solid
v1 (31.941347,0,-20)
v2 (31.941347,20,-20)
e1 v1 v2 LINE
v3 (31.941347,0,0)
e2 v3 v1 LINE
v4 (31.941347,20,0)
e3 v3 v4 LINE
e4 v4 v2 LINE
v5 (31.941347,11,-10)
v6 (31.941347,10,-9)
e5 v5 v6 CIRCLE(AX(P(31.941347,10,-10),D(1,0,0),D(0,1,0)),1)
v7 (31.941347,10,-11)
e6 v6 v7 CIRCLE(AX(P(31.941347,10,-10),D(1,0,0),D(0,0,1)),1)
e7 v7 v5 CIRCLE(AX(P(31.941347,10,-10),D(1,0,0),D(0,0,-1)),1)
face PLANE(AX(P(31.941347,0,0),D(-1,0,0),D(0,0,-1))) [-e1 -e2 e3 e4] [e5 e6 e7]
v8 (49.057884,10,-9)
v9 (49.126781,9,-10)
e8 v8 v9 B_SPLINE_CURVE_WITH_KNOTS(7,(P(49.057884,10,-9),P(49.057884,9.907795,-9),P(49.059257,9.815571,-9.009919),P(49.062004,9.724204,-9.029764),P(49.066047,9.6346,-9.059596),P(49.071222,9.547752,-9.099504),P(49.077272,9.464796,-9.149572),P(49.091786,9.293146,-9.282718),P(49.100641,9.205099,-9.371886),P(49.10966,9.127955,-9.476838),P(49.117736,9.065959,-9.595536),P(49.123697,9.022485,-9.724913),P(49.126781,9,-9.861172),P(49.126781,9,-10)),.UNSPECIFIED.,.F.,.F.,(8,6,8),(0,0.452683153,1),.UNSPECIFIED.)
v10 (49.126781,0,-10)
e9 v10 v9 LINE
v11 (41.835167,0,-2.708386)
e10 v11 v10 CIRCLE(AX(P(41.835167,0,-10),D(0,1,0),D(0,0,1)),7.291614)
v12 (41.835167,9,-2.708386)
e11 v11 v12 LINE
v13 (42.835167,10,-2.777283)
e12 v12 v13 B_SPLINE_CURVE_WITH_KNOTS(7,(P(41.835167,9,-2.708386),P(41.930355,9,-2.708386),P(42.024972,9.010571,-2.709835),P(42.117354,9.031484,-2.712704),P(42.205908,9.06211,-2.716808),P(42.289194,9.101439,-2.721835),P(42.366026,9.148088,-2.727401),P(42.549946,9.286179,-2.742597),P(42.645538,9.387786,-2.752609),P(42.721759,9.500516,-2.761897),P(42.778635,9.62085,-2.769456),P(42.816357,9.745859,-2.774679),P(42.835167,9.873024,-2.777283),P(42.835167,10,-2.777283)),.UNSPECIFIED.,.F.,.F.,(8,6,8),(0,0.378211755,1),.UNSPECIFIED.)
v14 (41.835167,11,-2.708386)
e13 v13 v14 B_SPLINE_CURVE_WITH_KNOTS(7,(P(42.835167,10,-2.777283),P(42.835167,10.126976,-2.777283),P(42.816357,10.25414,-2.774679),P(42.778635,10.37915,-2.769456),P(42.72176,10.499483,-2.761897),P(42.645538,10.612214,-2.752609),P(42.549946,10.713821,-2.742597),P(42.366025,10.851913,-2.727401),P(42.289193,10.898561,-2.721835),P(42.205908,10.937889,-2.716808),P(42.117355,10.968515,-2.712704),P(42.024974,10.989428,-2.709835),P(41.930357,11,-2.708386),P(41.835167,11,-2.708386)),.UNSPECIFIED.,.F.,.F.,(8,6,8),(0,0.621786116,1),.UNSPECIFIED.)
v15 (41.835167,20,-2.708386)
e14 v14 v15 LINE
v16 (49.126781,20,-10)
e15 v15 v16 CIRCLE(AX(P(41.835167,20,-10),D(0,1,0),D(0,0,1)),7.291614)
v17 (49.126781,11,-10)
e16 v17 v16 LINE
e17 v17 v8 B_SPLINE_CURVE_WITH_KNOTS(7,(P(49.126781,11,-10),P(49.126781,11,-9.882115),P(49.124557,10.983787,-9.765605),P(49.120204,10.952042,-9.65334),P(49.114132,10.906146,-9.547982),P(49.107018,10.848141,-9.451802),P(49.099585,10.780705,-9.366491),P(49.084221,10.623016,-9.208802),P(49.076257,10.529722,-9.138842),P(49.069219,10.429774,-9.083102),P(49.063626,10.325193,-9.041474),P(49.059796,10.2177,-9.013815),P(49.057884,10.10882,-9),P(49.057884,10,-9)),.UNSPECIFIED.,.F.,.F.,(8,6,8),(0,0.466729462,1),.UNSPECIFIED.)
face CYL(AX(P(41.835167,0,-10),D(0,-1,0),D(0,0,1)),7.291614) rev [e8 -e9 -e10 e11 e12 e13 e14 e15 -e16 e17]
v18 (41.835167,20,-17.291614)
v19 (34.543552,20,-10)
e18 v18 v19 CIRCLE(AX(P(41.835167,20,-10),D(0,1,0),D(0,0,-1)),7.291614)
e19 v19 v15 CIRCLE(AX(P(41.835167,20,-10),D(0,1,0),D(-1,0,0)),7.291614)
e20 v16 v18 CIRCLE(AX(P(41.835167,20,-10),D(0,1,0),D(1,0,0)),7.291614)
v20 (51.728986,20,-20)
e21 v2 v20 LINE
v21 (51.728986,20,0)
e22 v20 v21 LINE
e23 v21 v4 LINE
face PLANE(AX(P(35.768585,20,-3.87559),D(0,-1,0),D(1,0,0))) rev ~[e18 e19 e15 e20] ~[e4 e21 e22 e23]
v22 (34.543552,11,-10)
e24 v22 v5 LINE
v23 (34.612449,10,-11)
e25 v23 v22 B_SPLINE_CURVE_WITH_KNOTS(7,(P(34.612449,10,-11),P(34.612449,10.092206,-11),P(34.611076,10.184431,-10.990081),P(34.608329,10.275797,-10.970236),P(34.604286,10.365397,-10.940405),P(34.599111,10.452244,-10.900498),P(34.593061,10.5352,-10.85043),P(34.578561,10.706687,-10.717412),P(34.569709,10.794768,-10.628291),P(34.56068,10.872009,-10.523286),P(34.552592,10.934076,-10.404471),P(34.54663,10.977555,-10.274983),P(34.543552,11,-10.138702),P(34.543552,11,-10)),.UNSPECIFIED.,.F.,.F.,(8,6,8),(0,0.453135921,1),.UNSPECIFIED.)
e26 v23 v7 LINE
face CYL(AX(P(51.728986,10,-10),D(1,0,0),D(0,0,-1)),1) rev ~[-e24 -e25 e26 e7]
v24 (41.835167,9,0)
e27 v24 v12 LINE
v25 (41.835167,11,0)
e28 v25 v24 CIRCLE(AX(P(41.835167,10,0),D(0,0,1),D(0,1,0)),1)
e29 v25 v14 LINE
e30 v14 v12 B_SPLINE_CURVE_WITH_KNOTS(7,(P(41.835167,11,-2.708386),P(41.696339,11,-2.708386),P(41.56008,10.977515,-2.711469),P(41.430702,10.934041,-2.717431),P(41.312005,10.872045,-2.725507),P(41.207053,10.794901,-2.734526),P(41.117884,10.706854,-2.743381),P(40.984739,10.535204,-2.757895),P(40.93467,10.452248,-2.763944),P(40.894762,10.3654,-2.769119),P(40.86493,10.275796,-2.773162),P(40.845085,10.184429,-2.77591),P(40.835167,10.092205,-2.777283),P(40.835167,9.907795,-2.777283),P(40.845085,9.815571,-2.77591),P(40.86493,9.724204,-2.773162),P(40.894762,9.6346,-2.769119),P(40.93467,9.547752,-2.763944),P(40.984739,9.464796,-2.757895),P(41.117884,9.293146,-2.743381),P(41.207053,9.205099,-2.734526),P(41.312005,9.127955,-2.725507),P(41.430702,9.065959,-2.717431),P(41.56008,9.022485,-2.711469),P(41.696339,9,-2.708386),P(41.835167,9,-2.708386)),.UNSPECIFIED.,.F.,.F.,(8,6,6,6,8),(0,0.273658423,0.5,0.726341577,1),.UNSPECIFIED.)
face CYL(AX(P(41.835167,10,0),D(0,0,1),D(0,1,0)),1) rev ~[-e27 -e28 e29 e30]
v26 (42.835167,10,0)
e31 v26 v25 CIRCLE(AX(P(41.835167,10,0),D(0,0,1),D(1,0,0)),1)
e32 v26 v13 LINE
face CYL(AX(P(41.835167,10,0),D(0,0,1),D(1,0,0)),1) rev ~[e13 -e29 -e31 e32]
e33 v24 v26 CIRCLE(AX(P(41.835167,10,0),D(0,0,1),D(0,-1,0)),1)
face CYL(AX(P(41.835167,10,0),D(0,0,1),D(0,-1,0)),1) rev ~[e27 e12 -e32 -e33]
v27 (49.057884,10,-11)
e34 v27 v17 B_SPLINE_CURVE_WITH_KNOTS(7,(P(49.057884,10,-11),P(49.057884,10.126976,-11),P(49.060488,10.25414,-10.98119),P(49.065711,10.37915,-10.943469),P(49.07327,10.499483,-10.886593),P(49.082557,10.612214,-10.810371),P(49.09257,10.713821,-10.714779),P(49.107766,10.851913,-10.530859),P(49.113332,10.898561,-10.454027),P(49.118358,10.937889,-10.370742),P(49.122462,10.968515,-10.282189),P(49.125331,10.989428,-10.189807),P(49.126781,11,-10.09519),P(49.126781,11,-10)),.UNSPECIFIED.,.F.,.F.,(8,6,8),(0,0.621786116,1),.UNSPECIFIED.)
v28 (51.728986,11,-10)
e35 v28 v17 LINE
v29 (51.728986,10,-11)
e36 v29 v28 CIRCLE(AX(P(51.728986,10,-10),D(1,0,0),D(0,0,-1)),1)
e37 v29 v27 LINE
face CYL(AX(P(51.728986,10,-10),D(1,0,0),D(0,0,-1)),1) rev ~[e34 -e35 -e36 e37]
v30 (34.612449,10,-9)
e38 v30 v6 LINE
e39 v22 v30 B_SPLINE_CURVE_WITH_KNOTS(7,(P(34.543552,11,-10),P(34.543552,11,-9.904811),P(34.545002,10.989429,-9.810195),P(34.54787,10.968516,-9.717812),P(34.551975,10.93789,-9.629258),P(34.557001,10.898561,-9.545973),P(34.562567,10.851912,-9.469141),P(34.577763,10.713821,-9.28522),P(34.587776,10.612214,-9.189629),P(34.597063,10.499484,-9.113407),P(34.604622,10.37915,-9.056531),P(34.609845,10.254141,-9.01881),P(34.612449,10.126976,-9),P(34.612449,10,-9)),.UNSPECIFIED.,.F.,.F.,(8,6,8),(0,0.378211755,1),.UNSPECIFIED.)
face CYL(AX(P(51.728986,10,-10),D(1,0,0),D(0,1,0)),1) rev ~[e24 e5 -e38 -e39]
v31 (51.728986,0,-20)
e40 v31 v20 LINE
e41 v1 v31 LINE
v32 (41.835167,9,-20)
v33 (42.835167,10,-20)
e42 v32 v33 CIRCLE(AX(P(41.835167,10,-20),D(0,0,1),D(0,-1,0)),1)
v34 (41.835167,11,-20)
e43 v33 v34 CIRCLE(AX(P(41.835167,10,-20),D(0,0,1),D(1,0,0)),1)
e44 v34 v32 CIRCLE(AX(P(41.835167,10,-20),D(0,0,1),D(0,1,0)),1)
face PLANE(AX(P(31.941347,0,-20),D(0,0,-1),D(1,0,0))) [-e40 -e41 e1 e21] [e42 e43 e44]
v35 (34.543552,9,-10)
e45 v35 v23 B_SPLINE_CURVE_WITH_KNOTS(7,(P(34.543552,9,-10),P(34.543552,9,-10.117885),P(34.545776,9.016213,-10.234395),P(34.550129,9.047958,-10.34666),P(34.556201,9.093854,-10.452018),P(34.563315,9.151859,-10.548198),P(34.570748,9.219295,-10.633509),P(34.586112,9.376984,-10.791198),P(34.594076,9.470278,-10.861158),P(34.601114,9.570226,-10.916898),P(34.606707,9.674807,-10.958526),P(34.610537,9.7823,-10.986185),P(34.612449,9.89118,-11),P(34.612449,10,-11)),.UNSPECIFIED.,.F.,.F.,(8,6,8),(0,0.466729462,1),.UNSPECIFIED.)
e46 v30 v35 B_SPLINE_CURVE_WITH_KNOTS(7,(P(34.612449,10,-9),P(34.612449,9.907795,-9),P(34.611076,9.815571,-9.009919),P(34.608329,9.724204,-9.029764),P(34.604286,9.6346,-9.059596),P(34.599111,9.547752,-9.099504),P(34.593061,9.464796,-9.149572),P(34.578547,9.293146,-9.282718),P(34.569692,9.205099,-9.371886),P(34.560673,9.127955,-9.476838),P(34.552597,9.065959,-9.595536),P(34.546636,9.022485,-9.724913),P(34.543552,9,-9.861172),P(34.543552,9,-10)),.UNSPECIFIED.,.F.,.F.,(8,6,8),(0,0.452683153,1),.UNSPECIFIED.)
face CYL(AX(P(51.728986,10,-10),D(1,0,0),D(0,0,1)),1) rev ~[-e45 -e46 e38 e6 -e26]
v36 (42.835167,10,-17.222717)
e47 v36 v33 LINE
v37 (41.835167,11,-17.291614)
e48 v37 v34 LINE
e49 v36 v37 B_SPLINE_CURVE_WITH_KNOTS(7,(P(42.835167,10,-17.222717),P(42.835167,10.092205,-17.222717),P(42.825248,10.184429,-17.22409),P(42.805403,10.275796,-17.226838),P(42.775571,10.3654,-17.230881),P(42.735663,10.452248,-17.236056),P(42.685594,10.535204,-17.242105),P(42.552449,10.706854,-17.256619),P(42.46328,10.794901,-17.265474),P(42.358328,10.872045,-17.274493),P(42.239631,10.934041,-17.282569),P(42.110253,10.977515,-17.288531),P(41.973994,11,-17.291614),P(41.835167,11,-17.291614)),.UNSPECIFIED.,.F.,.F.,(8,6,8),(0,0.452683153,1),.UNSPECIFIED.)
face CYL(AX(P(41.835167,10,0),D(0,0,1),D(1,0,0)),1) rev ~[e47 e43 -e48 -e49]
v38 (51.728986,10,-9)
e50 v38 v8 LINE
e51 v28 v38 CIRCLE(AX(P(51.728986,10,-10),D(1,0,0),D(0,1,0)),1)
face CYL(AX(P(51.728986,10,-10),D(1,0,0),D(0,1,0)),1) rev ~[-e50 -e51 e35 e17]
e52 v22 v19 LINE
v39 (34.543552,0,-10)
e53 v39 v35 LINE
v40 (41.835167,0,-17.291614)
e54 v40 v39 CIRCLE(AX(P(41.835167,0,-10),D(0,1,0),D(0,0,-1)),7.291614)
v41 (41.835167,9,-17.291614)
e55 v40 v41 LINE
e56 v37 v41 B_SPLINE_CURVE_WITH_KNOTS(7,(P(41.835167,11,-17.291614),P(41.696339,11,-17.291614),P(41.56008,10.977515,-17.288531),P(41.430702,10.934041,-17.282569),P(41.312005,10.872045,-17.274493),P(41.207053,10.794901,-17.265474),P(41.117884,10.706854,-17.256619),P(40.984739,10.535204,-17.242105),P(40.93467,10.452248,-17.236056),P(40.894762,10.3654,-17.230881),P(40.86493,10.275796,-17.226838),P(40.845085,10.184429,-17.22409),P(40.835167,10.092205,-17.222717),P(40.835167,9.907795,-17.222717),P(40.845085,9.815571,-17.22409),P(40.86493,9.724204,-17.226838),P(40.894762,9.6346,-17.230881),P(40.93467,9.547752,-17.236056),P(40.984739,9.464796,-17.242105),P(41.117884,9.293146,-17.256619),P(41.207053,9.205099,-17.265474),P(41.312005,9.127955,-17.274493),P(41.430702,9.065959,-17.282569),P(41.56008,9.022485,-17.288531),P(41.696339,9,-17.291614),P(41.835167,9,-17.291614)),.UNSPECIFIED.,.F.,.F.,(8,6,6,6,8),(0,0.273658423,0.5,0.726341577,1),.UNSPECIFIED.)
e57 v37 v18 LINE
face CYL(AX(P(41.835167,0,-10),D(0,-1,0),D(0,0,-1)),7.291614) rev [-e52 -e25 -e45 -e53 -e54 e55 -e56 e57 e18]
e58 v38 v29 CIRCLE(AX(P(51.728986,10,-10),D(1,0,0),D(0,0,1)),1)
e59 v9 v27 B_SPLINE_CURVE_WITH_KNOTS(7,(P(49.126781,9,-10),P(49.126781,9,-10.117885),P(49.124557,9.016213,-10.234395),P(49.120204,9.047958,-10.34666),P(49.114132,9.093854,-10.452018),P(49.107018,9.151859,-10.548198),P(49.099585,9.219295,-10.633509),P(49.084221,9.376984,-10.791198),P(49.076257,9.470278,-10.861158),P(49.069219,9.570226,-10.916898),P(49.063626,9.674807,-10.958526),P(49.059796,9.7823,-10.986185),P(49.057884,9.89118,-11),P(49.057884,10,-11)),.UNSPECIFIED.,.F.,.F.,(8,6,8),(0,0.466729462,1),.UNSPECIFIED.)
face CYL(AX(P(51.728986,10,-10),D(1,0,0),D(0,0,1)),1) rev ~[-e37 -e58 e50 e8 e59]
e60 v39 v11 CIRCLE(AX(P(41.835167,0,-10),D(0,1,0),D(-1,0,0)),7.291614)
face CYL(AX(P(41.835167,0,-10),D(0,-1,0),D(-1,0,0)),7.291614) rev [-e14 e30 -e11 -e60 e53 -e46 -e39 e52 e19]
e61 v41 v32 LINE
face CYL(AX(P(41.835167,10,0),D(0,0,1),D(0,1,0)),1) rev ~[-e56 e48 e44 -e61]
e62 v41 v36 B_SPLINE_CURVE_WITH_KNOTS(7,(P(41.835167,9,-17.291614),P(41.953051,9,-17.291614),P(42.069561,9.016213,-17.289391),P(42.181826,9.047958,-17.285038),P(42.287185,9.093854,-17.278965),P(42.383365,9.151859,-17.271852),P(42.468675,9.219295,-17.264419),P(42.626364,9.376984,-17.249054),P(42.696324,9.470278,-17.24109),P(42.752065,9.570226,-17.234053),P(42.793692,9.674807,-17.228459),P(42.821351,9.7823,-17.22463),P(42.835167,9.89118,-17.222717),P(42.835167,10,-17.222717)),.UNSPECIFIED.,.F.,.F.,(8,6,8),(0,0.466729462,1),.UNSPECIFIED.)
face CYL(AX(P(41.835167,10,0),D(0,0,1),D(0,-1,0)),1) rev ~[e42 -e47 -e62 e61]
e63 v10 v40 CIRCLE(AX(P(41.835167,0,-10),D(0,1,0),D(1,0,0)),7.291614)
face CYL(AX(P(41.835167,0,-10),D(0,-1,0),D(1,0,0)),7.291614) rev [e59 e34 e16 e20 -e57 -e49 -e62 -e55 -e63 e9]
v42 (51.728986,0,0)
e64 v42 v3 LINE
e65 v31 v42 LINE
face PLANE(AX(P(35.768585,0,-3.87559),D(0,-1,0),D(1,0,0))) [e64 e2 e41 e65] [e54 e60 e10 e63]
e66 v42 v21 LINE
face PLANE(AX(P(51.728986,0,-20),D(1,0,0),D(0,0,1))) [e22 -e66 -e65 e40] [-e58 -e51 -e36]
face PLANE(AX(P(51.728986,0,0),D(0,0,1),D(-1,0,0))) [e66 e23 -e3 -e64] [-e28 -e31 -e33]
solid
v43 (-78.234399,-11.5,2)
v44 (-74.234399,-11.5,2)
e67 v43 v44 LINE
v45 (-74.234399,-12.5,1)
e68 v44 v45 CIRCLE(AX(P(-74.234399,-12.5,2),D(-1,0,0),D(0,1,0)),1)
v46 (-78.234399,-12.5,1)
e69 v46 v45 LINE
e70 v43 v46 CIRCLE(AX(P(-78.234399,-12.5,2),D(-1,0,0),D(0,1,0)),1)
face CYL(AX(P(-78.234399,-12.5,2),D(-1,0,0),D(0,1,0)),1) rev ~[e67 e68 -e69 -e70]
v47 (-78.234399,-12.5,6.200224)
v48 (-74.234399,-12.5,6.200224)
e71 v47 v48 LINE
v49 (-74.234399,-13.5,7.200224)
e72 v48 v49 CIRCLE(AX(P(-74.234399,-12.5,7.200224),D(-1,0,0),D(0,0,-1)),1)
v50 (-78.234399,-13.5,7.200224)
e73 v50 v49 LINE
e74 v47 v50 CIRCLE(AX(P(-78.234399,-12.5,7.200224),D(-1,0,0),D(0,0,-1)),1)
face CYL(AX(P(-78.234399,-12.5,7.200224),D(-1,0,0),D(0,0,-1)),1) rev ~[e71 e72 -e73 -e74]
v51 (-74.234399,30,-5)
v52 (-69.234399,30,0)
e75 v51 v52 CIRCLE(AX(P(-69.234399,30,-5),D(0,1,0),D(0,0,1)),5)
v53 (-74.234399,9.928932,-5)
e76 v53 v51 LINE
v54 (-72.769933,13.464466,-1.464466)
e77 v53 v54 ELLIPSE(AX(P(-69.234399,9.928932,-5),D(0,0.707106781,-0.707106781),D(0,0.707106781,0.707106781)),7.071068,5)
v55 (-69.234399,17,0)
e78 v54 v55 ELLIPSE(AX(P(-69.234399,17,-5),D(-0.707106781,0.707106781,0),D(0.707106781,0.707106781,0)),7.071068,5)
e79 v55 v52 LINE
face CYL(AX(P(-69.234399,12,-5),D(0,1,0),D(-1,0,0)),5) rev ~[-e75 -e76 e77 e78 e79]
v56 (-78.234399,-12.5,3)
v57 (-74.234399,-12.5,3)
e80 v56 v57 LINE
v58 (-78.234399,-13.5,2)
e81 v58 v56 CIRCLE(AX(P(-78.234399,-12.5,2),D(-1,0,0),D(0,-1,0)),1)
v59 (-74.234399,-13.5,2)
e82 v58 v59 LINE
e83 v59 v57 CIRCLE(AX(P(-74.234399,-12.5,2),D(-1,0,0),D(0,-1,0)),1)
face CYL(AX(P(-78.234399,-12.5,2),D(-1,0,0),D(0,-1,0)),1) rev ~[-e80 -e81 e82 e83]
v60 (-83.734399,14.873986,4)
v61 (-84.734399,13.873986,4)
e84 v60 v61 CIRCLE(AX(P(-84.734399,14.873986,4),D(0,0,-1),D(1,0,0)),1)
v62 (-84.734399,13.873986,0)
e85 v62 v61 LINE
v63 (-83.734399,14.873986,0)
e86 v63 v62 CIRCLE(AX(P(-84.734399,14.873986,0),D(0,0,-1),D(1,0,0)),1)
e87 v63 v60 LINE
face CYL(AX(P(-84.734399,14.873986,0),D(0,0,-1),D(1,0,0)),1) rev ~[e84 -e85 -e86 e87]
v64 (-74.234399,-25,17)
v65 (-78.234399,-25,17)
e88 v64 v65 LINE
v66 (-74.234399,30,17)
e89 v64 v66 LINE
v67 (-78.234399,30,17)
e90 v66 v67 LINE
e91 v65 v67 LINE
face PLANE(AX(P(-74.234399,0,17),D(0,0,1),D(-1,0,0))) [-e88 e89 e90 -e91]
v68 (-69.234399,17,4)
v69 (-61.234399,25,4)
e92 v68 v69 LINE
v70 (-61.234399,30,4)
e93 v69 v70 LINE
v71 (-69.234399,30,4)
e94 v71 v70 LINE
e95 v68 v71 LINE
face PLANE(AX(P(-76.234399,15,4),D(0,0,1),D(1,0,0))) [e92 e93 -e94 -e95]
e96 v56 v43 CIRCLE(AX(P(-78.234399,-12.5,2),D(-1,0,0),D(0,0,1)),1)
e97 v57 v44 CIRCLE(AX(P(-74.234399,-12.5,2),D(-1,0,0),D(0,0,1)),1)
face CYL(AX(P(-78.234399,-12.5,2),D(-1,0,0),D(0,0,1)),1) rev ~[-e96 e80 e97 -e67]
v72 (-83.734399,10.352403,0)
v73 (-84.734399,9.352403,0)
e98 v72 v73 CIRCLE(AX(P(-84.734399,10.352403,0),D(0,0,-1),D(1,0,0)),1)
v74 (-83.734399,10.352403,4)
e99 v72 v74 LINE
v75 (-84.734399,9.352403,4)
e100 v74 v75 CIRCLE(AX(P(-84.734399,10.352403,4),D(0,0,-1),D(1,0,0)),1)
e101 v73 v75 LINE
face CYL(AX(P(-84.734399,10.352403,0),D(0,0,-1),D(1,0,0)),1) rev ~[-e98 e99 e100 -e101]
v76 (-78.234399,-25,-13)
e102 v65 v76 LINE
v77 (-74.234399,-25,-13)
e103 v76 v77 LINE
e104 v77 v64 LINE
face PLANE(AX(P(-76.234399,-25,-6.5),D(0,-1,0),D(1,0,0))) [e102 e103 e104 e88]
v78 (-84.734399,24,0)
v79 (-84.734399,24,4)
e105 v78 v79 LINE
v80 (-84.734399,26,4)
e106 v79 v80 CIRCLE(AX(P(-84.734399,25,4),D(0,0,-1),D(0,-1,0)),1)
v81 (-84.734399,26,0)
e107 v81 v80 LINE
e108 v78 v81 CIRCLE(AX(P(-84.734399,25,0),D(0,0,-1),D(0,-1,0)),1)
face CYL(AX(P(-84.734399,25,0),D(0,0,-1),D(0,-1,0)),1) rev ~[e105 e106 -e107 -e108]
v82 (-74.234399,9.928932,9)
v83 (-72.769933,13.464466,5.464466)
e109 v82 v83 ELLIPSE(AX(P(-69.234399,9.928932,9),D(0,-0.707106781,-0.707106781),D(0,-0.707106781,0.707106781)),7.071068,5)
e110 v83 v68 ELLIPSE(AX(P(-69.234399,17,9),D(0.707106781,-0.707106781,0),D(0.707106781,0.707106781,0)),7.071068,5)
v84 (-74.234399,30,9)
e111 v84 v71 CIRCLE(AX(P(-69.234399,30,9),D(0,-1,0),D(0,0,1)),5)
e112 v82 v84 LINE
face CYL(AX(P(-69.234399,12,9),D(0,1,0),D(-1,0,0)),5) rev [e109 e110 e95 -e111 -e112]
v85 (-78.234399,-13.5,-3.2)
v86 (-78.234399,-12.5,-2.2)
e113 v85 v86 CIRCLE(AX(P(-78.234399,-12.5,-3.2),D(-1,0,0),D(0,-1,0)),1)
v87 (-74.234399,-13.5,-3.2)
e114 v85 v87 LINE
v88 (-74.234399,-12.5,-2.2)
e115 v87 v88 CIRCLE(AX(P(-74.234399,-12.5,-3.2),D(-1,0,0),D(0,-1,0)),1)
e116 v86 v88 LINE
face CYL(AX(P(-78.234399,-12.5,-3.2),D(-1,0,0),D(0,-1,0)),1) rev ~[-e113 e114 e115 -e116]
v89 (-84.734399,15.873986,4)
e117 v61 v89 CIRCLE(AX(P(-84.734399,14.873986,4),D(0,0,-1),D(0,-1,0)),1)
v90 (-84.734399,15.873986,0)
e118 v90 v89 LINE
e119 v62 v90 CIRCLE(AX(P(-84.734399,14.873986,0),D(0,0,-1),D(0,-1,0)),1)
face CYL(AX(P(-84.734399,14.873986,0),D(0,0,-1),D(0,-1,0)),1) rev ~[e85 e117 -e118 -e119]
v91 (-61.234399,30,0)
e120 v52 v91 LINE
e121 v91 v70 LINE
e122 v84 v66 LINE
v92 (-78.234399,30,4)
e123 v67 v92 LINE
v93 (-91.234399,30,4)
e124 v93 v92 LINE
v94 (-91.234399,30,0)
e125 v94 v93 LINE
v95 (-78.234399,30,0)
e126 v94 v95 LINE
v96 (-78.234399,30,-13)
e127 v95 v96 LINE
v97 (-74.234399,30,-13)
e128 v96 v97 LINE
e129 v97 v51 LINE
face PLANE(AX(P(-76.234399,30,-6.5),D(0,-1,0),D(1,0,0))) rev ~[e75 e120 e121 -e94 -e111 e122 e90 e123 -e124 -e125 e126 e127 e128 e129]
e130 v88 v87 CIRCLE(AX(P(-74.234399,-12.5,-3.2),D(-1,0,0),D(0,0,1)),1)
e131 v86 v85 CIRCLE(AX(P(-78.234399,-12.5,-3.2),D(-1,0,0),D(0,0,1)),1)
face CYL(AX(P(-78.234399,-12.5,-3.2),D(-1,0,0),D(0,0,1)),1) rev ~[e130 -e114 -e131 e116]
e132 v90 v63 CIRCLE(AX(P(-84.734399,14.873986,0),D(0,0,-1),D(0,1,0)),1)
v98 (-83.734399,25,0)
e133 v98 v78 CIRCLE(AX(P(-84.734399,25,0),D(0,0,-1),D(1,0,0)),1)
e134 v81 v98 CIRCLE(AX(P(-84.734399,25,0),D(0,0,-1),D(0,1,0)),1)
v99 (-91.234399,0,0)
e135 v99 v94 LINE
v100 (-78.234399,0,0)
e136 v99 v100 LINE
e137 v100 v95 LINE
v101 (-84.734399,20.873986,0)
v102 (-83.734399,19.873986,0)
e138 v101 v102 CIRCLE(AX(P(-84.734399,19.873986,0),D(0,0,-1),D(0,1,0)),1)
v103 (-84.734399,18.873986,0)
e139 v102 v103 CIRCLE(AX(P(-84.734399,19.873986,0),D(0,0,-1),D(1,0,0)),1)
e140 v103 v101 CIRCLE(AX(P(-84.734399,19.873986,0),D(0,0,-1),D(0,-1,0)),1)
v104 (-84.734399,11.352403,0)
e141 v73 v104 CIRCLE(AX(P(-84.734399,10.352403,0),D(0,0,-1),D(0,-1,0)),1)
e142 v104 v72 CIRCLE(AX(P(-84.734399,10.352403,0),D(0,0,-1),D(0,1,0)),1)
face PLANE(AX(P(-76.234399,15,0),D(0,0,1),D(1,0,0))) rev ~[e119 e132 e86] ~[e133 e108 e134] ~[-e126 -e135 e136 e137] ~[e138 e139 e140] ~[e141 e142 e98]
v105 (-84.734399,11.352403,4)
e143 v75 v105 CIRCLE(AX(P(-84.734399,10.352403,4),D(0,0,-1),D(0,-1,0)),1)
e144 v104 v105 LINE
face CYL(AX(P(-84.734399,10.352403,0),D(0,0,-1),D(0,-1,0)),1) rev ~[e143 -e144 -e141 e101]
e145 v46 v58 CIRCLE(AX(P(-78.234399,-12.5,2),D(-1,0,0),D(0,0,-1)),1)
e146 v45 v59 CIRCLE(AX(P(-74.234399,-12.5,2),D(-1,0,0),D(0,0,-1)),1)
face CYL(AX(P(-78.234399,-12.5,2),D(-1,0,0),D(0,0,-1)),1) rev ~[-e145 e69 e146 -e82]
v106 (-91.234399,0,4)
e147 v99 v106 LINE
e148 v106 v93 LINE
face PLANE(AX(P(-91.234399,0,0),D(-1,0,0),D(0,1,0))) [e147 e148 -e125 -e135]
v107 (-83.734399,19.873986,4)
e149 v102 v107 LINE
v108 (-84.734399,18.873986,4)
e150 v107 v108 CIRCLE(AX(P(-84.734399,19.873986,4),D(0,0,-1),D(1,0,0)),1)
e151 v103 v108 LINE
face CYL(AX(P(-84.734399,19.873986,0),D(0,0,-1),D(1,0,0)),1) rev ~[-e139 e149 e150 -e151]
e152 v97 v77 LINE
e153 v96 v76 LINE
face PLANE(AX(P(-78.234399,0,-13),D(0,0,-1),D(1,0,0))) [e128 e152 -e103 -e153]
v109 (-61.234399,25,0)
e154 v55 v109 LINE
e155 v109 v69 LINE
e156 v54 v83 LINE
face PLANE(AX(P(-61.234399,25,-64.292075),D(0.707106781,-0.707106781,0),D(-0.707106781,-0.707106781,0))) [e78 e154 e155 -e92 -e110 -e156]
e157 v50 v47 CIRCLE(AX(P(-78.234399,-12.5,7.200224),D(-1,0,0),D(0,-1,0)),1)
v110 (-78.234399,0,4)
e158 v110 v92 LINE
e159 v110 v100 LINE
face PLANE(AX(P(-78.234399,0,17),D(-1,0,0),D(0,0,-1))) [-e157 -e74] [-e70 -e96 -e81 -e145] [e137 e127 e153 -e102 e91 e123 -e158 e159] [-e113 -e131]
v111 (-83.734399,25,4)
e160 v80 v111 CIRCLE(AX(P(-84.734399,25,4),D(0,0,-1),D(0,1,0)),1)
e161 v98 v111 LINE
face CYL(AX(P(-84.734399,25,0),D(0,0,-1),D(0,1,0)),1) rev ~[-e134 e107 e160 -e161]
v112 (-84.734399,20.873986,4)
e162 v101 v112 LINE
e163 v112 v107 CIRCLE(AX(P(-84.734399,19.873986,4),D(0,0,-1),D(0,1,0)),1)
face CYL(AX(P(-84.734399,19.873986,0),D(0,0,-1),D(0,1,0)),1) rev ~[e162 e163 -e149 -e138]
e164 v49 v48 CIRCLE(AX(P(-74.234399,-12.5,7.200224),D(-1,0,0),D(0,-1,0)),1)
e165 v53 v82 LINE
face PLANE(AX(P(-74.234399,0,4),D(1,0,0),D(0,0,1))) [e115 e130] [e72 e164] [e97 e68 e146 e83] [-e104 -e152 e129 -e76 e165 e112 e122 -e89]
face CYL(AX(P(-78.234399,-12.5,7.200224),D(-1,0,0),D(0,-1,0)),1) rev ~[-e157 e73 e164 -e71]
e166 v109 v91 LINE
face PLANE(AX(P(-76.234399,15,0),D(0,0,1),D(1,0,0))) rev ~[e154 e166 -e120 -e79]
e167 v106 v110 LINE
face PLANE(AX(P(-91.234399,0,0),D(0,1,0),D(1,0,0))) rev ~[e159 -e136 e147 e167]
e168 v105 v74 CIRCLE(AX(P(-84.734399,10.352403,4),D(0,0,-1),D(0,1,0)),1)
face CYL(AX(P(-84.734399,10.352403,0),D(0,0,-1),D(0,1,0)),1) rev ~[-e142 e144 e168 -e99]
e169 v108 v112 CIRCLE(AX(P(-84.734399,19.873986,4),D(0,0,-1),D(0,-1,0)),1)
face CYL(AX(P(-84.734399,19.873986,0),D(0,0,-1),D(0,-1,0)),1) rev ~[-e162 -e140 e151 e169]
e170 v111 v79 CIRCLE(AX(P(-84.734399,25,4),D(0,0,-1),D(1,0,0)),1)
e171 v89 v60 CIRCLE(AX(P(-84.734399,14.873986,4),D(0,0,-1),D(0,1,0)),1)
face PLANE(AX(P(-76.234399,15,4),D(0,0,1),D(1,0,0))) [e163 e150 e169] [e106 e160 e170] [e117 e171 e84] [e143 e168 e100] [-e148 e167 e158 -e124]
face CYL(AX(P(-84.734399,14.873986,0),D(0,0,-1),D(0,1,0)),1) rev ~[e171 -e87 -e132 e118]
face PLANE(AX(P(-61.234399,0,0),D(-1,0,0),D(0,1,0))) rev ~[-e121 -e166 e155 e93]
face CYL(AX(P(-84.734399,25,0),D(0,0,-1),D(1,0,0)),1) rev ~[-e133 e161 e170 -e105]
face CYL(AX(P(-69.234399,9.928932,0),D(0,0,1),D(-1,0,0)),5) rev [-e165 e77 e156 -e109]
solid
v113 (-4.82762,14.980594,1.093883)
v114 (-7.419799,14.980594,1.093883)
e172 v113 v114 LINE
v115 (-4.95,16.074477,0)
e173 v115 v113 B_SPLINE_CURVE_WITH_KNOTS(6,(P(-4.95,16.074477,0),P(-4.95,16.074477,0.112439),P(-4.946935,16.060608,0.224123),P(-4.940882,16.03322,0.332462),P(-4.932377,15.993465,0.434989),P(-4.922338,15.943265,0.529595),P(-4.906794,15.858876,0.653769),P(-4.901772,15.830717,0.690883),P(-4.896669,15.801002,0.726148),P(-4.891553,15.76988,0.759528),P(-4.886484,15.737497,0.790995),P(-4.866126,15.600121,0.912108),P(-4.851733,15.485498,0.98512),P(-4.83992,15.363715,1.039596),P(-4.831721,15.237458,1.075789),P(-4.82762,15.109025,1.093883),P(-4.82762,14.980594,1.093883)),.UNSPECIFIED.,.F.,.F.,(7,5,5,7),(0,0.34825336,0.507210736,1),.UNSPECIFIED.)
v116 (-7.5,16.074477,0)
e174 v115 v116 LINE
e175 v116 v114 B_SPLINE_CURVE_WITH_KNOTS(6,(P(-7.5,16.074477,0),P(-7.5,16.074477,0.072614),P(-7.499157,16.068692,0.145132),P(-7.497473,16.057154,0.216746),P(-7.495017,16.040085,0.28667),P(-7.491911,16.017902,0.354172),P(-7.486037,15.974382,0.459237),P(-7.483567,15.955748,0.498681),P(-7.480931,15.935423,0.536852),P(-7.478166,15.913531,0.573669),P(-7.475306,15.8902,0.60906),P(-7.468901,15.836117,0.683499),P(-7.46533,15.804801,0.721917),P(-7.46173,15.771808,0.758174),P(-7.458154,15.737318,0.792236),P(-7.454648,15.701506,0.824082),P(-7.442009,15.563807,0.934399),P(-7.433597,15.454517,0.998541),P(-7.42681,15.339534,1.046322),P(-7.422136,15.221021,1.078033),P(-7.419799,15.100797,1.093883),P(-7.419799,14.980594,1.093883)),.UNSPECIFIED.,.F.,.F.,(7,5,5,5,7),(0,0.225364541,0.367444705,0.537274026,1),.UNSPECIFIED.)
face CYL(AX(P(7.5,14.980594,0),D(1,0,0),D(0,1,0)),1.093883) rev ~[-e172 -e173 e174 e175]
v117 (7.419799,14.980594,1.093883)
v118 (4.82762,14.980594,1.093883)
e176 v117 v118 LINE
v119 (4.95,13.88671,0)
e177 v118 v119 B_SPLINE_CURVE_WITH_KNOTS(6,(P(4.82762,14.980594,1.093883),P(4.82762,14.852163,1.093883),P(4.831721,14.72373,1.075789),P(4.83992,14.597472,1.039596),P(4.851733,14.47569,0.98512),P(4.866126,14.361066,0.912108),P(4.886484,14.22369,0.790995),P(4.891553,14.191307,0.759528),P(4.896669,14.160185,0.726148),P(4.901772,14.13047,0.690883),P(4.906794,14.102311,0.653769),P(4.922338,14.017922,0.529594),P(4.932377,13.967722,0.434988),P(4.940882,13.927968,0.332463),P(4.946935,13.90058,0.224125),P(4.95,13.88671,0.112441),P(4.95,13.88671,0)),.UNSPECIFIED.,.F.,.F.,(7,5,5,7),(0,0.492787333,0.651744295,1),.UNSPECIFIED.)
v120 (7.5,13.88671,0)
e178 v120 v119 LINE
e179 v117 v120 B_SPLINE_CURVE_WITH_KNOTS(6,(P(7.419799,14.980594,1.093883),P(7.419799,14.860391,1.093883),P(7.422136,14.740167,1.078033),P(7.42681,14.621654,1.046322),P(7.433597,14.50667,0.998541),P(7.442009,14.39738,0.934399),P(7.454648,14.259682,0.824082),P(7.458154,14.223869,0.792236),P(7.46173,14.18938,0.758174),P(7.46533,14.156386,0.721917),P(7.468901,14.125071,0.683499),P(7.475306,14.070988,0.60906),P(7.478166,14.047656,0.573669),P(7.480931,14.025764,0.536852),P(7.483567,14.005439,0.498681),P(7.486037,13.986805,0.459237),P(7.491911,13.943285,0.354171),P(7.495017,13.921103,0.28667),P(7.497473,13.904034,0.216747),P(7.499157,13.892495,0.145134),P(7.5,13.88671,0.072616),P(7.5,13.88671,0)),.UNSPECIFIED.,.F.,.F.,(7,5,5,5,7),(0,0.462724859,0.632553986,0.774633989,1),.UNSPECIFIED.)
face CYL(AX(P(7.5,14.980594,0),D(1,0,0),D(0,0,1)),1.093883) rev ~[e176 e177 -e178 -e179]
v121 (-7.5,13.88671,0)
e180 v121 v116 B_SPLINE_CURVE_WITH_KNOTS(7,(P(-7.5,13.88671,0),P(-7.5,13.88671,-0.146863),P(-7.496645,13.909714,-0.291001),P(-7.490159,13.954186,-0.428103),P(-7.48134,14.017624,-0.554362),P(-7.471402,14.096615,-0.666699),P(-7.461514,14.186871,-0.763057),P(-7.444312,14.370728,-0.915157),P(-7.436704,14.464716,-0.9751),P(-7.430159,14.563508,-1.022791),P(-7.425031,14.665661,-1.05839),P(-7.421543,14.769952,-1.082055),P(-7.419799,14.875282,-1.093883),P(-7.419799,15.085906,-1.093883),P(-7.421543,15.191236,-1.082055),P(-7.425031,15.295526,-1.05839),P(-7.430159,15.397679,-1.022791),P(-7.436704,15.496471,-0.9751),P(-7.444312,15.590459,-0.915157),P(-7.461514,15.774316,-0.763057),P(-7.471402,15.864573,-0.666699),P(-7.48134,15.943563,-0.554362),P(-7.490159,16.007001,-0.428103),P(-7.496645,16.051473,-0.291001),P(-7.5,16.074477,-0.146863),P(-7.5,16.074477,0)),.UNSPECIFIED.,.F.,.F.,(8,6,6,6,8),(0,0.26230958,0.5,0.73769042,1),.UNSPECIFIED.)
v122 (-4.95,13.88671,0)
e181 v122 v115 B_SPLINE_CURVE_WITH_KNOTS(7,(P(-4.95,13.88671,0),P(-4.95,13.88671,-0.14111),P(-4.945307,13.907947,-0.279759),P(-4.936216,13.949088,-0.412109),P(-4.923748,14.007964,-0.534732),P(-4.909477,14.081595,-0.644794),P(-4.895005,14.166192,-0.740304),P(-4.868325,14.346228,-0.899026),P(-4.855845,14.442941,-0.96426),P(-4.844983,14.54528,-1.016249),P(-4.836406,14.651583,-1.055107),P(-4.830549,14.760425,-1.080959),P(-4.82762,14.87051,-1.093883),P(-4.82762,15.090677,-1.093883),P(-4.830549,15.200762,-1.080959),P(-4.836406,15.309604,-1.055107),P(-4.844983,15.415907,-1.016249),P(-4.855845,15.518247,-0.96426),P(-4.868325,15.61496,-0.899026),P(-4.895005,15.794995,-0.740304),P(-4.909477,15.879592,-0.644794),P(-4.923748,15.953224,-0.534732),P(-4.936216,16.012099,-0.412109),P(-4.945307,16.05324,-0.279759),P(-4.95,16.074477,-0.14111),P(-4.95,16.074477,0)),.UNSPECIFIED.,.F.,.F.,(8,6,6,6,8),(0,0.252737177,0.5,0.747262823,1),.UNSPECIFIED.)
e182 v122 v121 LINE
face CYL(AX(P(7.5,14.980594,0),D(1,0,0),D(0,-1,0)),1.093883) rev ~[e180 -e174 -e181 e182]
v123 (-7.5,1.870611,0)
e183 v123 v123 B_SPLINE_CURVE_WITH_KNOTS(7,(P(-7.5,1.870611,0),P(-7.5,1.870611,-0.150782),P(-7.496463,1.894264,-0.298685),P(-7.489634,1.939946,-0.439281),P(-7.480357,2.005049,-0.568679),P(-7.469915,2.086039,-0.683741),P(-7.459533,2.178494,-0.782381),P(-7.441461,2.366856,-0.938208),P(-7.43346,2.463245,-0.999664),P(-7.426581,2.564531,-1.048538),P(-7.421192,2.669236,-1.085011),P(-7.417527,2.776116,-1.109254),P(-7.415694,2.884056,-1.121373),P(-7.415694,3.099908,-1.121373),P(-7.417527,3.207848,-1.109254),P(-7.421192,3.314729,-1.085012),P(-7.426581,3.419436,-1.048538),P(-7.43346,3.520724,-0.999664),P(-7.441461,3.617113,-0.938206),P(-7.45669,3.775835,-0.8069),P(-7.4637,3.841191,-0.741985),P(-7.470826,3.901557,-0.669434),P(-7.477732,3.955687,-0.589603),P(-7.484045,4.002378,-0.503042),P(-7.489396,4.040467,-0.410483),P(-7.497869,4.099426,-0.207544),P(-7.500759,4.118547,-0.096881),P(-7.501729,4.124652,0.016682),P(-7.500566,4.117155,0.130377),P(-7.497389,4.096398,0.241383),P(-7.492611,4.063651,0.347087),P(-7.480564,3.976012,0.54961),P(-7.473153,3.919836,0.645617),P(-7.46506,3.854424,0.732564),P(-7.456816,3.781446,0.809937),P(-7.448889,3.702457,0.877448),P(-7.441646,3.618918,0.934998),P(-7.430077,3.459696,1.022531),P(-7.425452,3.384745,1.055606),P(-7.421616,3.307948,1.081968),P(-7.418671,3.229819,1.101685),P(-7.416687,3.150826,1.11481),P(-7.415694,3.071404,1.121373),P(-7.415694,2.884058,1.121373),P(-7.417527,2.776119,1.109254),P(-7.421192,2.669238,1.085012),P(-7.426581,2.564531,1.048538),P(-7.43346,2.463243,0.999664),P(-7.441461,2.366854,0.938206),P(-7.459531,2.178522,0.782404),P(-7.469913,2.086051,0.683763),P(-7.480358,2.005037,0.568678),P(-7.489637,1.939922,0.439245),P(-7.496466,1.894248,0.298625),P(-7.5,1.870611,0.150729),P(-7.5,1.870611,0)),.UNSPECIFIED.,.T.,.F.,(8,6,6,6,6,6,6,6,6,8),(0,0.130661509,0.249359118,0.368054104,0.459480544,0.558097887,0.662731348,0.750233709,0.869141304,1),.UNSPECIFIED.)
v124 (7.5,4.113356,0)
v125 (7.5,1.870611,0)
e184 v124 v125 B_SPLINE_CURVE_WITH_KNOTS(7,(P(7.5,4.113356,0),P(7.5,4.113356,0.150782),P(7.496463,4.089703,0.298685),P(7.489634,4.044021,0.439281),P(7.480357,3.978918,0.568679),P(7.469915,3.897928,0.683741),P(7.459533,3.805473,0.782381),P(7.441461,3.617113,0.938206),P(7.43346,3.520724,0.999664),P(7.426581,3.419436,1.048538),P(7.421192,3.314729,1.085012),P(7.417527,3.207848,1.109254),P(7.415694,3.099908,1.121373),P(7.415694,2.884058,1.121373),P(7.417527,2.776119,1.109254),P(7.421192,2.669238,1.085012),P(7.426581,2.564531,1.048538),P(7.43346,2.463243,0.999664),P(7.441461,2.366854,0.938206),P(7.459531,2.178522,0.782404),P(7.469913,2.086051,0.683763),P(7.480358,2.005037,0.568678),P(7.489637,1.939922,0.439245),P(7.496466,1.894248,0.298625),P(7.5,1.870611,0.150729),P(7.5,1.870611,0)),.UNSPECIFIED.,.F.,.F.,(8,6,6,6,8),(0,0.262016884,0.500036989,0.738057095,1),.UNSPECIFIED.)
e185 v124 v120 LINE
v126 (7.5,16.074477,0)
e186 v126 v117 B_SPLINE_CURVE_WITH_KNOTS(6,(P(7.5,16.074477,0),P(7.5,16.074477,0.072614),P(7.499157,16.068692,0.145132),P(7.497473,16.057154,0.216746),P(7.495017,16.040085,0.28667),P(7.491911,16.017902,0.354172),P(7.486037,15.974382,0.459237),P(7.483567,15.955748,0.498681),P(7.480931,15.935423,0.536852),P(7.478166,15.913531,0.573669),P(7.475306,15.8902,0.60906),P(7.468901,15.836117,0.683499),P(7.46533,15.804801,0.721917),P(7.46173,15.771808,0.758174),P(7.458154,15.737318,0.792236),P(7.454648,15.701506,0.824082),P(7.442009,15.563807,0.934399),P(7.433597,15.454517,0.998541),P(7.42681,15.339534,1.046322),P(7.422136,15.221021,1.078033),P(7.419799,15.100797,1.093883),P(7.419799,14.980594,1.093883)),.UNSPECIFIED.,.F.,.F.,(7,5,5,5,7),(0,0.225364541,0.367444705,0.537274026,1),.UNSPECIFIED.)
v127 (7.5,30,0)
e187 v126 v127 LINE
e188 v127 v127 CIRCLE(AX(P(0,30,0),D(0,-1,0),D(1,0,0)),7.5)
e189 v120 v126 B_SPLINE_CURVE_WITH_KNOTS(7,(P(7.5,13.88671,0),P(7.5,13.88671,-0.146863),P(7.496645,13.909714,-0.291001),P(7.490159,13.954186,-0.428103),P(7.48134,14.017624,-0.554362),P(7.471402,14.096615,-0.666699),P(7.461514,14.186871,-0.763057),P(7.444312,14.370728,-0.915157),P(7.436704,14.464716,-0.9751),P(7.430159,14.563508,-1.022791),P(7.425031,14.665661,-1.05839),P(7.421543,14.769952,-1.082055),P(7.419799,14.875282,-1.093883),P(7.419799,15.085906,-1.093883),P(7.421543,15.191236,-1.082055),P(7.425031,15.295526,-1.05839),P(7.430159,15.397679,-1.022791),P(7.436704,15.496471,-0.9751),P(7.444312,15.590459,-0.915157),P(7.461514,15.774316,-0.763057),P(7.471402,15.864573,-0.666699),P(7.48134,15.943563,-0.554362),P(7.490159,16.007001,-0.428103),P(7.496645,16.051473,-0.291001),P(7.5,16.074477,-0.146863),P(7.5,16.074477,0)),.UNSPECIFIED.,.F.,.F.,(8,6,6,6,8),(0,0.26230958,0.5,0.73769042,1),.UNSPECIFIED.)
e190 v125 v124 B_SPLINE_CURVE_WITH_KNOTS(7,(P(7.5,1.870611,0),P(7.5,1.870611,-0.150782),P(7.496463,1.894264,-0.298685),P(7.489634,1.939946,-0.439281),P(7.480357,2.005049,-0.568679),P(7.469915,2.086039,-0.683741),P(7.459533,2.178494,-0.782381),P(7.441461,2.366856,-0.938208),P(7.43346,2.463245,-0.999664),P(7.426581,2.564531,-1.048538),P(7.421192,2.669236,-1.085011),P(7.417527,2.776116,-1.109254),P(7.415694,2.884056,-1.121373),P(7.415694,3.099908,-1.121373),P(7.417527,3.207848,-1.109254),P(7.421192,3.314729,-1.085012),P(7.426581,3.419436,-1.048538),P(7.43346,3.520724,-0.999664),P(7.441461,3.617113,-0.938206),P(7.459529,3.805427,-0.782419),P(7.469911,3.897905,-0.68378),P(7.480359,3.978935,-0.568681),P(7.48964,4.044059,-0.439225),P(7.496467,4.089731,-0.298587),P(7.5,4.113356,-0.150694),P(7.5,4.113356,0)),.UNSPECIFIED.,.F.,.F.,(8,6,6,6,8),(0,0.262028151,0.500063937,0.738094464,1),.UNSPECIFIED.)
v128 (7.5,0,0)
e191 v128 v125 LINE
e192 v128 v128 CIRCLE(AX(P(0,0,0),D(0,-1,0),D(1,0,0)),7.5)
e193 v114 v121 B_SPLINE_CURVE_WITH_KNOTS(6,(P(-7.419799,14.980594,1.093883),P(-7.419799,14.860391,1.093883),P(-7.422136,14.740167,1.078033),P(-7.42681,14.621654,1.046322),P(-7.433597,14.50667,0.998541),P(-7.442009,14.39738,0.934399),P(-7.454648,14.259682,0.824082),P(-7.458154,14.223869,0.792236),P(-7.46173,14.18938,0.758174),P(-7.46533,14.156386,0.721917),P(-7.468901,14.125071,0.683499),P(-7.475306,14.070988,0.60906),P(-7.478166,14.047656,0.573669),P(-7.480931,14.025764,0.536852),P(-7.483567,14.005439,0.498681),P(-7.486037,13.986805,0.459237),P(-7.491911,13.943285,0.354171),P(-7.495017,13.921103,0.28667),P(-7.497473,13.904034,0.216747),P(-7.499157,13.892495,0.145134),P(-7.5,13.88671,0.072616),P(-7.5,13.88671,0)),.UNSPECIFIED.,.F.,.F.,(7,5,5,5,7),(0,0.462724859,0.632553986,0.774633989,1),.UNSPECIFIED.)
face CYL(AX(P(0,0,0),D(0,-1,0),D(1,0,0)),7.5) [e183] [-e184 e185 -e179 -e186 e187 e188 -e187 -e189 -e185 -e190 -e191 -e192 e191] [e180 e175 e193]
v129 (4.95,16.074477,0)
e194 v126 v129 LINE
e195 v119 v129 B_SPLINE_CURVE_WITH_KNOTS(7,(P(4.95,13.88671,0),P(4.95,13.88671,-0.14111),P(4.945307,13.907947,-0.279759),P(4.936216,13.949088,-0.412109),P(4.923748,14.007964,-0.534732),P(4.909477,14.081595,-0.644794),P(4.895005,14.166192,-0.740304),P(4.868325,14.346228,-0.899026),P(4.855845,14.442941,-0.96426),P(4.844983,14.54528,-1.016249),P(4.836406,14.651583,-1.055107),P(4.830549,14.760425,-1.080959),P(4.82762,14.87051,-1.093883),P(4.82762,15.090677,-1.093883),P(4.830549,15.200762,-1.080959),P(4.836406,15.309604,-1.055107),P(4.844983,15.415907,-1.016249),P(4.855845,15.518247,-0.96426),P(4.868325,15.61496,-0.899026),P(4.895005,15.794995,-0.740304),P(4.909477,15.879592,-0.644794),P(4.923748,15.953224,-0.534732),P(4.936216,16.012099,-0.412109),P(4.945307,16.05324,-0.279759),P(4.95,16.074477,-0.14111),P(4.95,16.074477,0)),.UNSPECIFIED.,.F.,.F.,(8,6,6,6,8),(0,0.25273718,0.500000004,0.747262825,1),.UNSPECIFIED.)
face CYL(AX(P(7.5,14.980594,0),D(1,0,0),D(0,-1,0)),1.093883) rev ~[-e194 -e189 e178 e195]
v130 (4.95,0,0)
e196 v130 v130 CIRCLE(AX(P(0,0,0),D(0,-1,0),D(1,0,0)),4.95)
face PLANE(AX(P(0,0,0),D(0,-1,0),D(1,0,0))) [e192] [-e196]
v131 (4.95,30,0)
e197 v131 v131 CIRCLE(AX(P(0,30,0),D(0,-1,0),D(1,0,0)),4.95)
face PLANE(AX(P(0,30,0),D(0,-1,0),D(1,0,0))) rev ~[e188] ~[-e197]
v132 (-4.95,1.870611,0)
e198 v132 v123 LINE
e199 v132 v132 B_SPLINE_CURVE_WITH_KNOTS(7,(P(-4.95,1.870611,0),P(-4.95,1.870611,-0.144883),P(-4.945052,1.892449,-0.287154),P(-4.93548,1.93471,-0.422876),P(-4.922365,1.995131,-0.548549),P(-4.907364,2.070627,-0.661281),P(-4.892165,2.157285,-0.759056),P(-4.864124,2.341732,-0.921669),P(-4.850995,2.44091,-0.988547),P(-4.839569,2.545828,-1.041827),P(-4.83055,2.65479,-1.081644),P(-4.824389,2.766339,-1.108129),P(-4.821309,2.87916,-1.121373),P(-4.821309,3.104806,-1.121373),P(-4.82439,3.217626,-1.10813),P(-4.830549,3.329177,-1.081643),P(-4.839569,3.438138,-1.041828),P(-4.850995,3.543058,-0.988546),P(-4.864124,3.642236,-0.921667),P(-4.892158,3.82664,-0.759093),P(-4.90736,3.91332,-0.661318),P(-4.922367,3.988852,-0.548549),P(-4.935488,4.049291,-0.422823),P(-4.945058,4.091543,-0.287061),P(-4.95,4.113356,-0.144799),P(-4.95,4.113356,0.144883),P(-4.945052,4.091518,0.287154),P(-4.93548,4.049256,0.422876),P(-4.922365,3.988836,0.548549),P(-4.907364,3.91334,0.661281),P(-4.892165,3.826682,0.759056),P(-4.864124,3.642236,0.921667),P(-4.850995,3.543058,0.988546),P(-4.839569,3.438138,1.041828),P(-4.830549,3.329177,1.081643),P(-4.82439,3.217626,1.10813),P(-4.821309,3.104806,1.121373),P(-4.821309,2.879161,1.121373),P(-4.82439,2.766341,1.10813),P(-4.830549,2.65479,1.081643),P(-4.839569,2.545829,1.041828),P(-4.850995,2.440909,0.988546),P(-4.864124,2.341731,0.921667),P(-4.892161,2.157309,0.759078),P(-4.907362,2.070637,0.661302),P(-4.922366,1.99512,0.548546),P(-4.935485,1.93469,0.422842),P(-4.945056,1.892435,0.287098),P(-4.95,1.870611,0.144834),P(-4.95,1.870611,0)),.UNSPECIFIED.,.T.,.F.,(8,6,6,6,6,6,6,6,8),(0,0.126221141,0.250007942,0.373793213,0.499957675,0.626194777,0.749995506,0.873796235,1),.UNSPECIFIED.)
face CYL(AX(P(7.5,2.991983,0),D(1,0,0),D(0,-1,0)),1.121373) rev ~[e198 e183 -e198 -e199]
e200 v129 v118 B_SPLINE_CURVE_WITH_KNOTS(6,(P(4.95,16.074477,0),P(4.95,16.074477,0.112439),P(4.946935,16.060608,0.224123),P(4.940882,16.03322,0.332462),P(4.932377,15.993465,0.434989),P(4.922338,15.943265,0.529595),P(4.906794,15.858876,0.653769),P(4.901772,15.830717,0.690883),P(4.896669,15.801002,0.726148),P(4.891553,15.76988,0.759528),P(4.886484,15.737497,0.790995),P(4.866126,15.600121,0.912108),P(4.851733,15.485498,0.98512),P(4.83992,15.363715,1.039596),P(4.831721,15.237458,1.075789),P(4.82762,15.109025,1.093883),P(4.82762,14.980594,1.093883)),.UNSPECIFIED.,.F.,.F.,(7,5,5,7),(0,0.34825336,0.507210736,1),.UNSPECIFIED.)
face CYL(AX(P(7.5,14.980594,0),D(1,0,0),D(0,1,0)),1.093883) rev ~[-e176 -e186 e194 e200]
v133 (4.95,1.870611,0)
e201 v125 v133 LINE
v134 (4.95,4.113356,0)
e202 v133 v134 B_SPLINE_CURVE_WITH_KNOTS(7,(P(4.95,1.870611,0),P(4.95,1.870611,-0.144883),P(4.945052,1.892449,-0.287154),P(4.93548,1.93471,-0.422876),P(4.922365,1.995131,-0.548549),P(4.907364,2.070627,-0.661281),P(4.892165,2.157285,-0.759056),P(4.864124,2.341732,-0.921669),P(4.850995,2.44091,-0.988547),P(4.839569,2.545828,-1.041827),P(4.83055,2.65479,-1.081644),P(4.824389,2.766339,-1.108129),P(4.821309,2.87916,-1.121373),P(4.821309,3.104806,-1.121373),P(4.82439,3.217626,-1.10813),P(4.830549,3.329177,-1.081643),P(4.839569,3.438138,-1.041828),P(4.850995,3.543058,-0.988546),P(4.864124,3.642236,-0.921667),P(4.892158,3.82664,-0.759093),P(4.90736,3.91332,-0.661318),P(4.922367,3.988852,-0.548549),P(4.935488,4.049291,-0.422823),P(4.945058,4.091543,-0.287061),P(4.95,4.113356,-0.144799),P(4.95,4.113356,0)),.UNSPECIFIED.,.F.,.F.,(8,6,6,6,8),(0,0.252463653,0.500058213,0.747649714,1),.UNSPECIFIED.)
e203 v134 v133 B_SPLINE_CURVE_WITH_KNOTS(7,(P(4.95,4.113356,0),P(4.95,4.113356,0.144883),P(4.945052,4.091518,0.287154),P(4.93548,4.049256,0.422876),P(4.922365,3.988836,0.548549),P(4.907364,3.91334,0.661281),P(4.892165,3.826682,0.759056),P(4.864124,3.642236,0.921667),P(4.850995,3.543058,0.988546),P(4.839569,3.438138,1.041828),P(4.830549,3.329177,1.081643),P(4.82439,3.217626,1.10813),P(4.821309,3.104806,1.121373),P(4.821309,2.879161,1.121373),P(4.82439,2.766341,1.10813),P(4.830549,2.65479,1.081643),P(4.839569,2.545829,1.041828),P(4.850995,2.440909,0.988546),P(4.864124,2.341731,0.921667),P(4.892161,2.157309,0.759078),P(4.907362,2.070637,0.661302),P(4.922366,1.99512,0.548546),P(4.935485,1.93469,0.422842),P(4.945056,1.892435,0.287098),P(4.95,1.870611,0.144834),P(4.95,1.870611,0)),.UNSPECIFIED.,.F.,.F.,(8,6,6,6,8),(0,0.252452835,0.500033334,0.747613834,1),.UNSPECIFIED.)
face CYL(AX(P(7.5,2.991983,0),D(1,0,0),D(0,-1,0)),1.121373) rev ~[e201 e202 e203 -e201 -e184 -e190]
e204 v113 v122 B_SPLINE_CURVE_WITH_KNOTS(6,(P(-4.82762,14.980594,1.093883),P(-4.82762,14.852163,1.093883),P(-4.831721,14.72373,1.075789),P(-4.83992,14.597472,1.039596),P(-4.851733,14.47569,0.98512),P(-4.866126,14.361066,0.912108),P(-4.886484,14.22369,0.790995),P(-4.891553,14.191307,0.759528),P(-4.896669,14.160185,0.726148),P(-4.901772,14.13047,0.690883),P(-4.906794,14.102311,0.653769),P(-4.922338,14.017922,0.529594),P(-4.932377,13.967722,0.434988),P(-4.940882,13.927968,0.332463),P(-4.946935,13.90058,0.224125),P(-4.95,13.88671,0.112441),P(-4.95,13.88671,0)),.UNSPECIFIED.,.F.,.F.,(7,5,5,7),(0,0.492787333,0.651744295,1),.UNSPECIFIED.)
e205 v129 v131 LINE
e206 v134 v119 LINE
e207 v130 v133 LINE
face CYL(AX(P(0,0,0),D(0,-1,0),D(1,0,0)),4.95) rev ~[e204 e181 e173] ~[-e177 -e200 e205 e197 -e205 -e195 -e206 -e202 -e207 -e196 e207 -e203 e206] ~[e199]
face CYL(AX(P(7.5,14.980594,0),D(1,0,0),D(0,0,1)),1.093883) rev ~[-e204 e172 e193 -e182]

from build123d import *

# Parameters (mm, degrees)
F0_R         = 7.5
F0_R_2       = 4.95
F1_DEPTH     = 30
F4_DEPTH     = 25
F6_DEPTH     = 20
F8_DEPTH     = 21
F10_DEPTH    = 21
F11_W        = 30
F11_H        = 30
F12_DEPTH    = 4
F13_W        = 4
F13_H        = 13
F14_DEPTH    = 25
F15_DEPTH    = 30
F16_DEPTH    = 30
F18_DEPTH    = 5
F19_T4_DEPTH = 132.5841493983
F20_R        = 5
F22_DEPTH    = 5


# Not quite as in the source:
# - a fillet or chamfer that OpenCascade refuses, or shapes differently, is made with other operations: its cross-section is extruded or revolved along the edge and cut away or added


with BuildPart() as f1:
    # F0 (on Front) → F1 (new body)
    with BuildSketch(Plane.XZ):
        Circle(F0_R)
        Circle(F0_R_2, mode=Mode.SUBTRACT)
    extrude(amount=-F1_DEPTH)

    # F3 (on offset) → F4 (cut)
    with BuildSketch(Plane.YZ.offset(7.5)):
        with BuildLine():
            Line((1.8706106639, 0), (2.9919834342, 0))
            Line((2.9919834342, 0), (4.1133562045, 0))
            ThreePointArc((4.1133562045, 0), (2.9919834342, 1.1213727703), (1.8706106639, 0))
        make_face()
        with BuildLine():
            Line((4.1133562045, 0), (2.9919834342, 0))
            Line((2.9919834342, 0), (1.8706106639, 0))
            ThreePointArc((1.8706106639, 0), (2.9919834342, -1.1213727703), (4.1133562045, 0))
        make_face()
        with BuildLine():
            ThreePointArc((14.9805936962, 1.0938833623), (14.2071013529, 0.7734923433), (13.8867103339, 0))
            Line((13.8867103339, 0), (14.9805936962, 0))
            Line((14.9805936962, 0), (14.9805936962, 1.0938833623))
        make_face()
        with BuildLine():
            Line((14.9805936962, 0), (13.8867103339, 0))
            ThreePointArc((13.8867103339, 0), (14.9805936962, -1.0938833623), (16.0744770585, 0))
            Line((16.0744770585, 0), (14.9805936962, 0))
        make_face()
        with BuildLine():
            Line((14.9805936962, 1.0938833623), (14.9805936962, 0))
            Line((14.9805936962, 0), (16.0744770585, 0))
            ThreePointArc((16.0744770585, 0), (15.7540860395, 0.7734923433), (14.9805936962, 1.0938833623))
        make_face()
    extrude(amount=-F4_DEPTH, mode=Mode.SUBTRACT)


with BuildPart() as f6:
    # F5 (on Front) → F6 (new body)
    with BuildSketch(Plane.XZ):
        with BuildLine():
            Line((41.8351665139, 0), (31.9413468242, 0))
            Line((31.9413468242, 0), (31.9413468242, -10))
            Line((31.9413468242, -10), (34.5435520147, -10))
            ThreePointArc((34.5435520147, -10), (36.6792164557, -4.8440499418), (41.8351665139, -2.7083855008))
            Line((41.8351665139, -2.7083855008), (41.8351665139, 0))
        make_face()
        with BuildLine():
            Line((51.7289862037, 0), (41.8351665139, 0))
            Line((41.8351665139, 0), (41.8351665139, -2.7083855008))
            ThreePointArc((41.8351665139, -2.7083855008), (46.9911165721, -4.8440499418), (49.1267810131, -10))
            Line((49.1267810131, -10), (51.7289862037, -10))
            Line((51.7289862037, -10), (51.7289862037, 0))
        make_face()
        with BuildLine():
            Line((51.7289862037, -20), (51.7289862037, -10))
            Line((51.7289862037, -10), (49.1267810131, -10))
            ThreePointArc((49.1267810131, -10), (46.9911165721, -15.1559500582), (41.8351665139, -17.2916144992))
            Line((41.8351665139, -17.2916144992), (41.8351665139, -20))
            Line((41.8351665139, -20), (51.7289862037, -20))
        make_face()
        with BuildLine():
            Line((34.5435520147, -10), (31.9413468242, -10))
            Line((31.9413468242, -10), (31.9413468242, -20))
            Line((31.9413468242, -20), (41.8351665139, -20))
            Line((41.8351665139, -20), (41.8351665139, -17.2916144992))
            ThreePointArc((41.8351665139, -17.2916144992), (36.6792164557, -15.1559500582), (34.5435520147, -10))
        make_face()
    extrude(amount=-F6_DEPTH)

    # F7 (on face) → F8 (cut)
    with BuildSketch(Plane.YZ.offset(51.7289862037)):
        with BuildLine():
            ThreePointArc((11, -10), (10.7071067812, -9.2928932188), (10, -9))
            Line((10, -9), (10, -11))
            ThreePointArc((10, -11), (10.7071067812, -10.7071067812), (11, -10))
        make_face()
        with BuildLine():
            Line((10, -11), (10, -9))
            ThreePointArc((10, -9), (9, -10), (10, -11))
        make_face()
    extrude(amount=-F8_DEPTH, mode=Mode.SUBTRACT)

    # F9 (on face) → F10 (cut)
    with BuildSketch(Plane.XY):
        with BuildLine():
            ThreePointArc((42.8351665139, 10), (42.5422732951, 10.7071067812), (41.8351665139, 11))
            Line((41.8351665139, 11), (41.8351665139, 9))
            ThreePointArc((41.8351665139, 9), (42.5422732951, 9.2928932188), (42.8351665139, 10))
        make_face()
        with BuildLine():
            Line((41.8351665139, 9), (41.8351665139, 11))
            ThreePointArc((41.8351665139, 11), (40.8351665139, 10), (41.8351665139, 9))
        make_face()
    extrude(amount=-F10_DEPTH, mode=Mode.SUBTRACT)


with BuildPart() as f12:
    # F11 (on Top) → F12 (new body)
    with BuildSketch(Plane.XY):
        with Locations((-76.2343985998, 15)):
            Rectangle(F11_W, F11_H)
    extrude(amount=F12_DEPTH)

    # F13 (on face) → F14 (join)
    with BuildSketch(Plane.XZ):
        with Locations((-76.2343985998, -6.5)):
            Rectangle(F13_W, F13_H)
        Polygon((-74.4660645723, 4), (-78.2343985998, 4), (-78.2343985998, 0), (-74.2343985998, 0), (-74.2343985998, 4), align=None)
        Polygon((-78.2343985998, 17), (-78.2343985998, 4), (-74.4660645723, 4), (-74.2343985998, 4), (-74.2343985998, 17), align=None)
    extrude(amount=F14_DEPTH)

    # F15 (add): a face of the model
    f15_faces = [f12.faces().sort_by_distance(p)[0] for p in [
        (-76.2343985998, 0, -6.5),
    ]]
    extrude(f15_faces, amount=F15_DEPTH)

    # F16 (add): a face of the model
    f16_faces = [f12.faces().sort_by_distance(p)[0] for p in [
        (-76.2343985998, 0, 10.5),
    ]]
    extrude(f16_faces, amount=F16_DEPTH)

    # F17 (on face) → F18 (cut)
    with BuildSketch(Plane(origin=(-78.2343985998, 0, 0), x_dir=(0, -1, 0), z_dir=(-1, 0, 0))):
        with BuildLine():
            ThreePointArc((12.5, 1), (13.2071067812, 1.2928932188), (13.5, 2))
            Line((13.5, 2), (12.5, 2))
            Line((12.5, 2), (12.5, 1))
        make_face()
        with BuildLine():
            Line((12.5, 2), (13.5, 2))
            ThreePointArc((13.5, 2), (13.2071067812, 2.7071067812), (12.5, 3))
            Line((12.5, 3), (12.5, 2))
        make_face()
        with BuildLine():
            ThreePointArc((13.5, -3.2), (13.2071067812, -2.4928932188), (12.5, -2.2))
            ThreePointArc((12.5, -2.2), (11.7928932188, -3.9071067812), (13.5, -3.2))
        make_face()
        with BuildLine():
            ThreePointArc((13.5, 7.2002243251), (11.7928932188, 7.9073311062), (12.5, 6.2002243251))
            ThreePointArc((12.5, 6.2002243251), (13.2071067812, 6.4931175439), (13.5, 7.2002243251))
        make_face()
        with BuildLine():
            Line((12.5, 1), (12.5, 2))
            Line((12.5, 2), (11.5, 2))
            ThreePointArc((11.5, 2), (11.7928932188, 1.2928932188), (12.5, 1))
        make_face()
        with BuildLine():
            Line((11.5, 2), (12.5, 2))
            Line((12.5, 2), (12.5, 3))
            ThreePointArc((12.5, 3), (11.7928932188, 2.7071067812), (11.5, 2))
        make_face()
    extrude(amount=-F18_DEPTH, mode=Mode.SUBTRACT)

    # F19: chamfer of 25 on 1 edges, made by hand


with BuildPart() as f19_tool2:
    # F19_s3 → F19_t4 (new body)
    with BuildSketch(Plane.XY.offset(-64.2920746991)):
        Polygon((-61.2343985998, 25), (-86.2343985998, 0), (-61.2343985998, 0), align=None)
    extrude(amount=F19_T4_DEPTH)

    split(bisect_by=Plane.YZ.offset(-74.2343985998), keep=Keep.TOP)


with BuildPart() as f12_1:
    add(f12.part)

    # F19_t1: cut F19_tool2
    add(f19_tool2.part, mode=Mode.SUBTRACT)

    # F20
    f20_edges = [f12_1.edges().sort_by_distance(p)[0] for p in [
        (-74.234399, 12, 2),
        (-74.234399, 21, 0),
        (-74.234399, 21, 4),
    ]]
    fillet(f20_edges, radius=F20_R)

    # F21 (on face) → F22 (cut)
    with BuildSketch(Plane(origin=(0, 0, 0), x_dir=(1, 0, 0), z_dir=(0, 0, -1))):
        with BuildLine():
            ThreePointArc((-84.7343985998, -24), (-85.7343985998, -25), (-84.7343985998, -26))
            Line((-84.7343985998, -26), (-84.7343985998, -24))
        make_face()
        with BuildLine():
            Line((-84.7343985998, -24), (-84.7343985998, -26))
            ThreePointArc((-84.7343985998, -26), (-84.0272918186, -25.7071067812), (-83.7343985998, -25))
            ThreePointArc((-83.7343985998, -25), (-84.0272918186, -24.2928932188), (-84.7343985998, -24))
        make_face()
        with BuildLine():
            ThreePointArc((-84.7343985998, -18.8739860207), (-85.7343985998, -19.8739860207), (-84.7343985998, -20.8739860207))
            Line((-84.7343985998, -20.8739860207), (-84.7343985998, -18.8739860207))
        make_face()
        with BuildLine():
            Line((-84.7343985998, -18.8739860207), (-84.7343985998, -20.8739860207))
            ThreePointArc((-84.7343985998, -20.8739860207), (-84.0272918186, -20.5810928019), (-83.7343985998, -19.8739860207))
            ThreePointArc((-83.7343985998, -19.8739860207), (-84.0272918186, -19.1668792395), (-84.7343985998, -18.8739860207))
        make_face()
        with BuildLine():
            ThreePointArc((-84.7343985998, -13.8739860207), (-85.7343985998, -14.8739860207), (-84.7343985998, -15.8739860207))
            Line((-84.7343985998, -15.8739860207), (-84.7343985998, -13.8739860207))
        make_face()
        with BuildLine():
            Line((-84.7343985998, -13.8739860207), (-84.7343985998, -15.8739860207))
            ThreePointArc((-84.7343985998, -15.8739860207), (-84.0272918186, -15.5810928019), (-83.7343985998, -14.8739860207))
            ThreePointArc((-83.7343985998, -14.8739860207), (-84.0272918186, -14.1668792395), (-84.7343985998, -13.8739860207))
        make_face()
        with BuildLine():
            Line((-84.7343985998, -11.3524029255), (-84.7343985998, -9.3524029255))
            ThreePointArc((-84.7343985998, -9.3524029255), (-85.7343985998, -10.3524029255), (-84.7343985998, -11.3524029255))
        make_face()
        with BuildLine():
            ThreePointArc((-83.7343985998, -10.3524029255), (-84.0272918186, -9.6452961443), (-84.7343985998, -9.3524029255))
            Line((-84.7343985998, -9.3524029255), (-84.7343985998, -11.3524029255))
            ThreePointArc((-84.7343985998, -11.3524029255), (-84.0272918186, -11.0595097067), (-83.7343985998, -10.3524029255))
        make_face()
    extrude(amount=-F22_DEPTH, mode=Mode.SUBTRACT)


solid = Compound([f1.part, f6.part, f12_1.part])
